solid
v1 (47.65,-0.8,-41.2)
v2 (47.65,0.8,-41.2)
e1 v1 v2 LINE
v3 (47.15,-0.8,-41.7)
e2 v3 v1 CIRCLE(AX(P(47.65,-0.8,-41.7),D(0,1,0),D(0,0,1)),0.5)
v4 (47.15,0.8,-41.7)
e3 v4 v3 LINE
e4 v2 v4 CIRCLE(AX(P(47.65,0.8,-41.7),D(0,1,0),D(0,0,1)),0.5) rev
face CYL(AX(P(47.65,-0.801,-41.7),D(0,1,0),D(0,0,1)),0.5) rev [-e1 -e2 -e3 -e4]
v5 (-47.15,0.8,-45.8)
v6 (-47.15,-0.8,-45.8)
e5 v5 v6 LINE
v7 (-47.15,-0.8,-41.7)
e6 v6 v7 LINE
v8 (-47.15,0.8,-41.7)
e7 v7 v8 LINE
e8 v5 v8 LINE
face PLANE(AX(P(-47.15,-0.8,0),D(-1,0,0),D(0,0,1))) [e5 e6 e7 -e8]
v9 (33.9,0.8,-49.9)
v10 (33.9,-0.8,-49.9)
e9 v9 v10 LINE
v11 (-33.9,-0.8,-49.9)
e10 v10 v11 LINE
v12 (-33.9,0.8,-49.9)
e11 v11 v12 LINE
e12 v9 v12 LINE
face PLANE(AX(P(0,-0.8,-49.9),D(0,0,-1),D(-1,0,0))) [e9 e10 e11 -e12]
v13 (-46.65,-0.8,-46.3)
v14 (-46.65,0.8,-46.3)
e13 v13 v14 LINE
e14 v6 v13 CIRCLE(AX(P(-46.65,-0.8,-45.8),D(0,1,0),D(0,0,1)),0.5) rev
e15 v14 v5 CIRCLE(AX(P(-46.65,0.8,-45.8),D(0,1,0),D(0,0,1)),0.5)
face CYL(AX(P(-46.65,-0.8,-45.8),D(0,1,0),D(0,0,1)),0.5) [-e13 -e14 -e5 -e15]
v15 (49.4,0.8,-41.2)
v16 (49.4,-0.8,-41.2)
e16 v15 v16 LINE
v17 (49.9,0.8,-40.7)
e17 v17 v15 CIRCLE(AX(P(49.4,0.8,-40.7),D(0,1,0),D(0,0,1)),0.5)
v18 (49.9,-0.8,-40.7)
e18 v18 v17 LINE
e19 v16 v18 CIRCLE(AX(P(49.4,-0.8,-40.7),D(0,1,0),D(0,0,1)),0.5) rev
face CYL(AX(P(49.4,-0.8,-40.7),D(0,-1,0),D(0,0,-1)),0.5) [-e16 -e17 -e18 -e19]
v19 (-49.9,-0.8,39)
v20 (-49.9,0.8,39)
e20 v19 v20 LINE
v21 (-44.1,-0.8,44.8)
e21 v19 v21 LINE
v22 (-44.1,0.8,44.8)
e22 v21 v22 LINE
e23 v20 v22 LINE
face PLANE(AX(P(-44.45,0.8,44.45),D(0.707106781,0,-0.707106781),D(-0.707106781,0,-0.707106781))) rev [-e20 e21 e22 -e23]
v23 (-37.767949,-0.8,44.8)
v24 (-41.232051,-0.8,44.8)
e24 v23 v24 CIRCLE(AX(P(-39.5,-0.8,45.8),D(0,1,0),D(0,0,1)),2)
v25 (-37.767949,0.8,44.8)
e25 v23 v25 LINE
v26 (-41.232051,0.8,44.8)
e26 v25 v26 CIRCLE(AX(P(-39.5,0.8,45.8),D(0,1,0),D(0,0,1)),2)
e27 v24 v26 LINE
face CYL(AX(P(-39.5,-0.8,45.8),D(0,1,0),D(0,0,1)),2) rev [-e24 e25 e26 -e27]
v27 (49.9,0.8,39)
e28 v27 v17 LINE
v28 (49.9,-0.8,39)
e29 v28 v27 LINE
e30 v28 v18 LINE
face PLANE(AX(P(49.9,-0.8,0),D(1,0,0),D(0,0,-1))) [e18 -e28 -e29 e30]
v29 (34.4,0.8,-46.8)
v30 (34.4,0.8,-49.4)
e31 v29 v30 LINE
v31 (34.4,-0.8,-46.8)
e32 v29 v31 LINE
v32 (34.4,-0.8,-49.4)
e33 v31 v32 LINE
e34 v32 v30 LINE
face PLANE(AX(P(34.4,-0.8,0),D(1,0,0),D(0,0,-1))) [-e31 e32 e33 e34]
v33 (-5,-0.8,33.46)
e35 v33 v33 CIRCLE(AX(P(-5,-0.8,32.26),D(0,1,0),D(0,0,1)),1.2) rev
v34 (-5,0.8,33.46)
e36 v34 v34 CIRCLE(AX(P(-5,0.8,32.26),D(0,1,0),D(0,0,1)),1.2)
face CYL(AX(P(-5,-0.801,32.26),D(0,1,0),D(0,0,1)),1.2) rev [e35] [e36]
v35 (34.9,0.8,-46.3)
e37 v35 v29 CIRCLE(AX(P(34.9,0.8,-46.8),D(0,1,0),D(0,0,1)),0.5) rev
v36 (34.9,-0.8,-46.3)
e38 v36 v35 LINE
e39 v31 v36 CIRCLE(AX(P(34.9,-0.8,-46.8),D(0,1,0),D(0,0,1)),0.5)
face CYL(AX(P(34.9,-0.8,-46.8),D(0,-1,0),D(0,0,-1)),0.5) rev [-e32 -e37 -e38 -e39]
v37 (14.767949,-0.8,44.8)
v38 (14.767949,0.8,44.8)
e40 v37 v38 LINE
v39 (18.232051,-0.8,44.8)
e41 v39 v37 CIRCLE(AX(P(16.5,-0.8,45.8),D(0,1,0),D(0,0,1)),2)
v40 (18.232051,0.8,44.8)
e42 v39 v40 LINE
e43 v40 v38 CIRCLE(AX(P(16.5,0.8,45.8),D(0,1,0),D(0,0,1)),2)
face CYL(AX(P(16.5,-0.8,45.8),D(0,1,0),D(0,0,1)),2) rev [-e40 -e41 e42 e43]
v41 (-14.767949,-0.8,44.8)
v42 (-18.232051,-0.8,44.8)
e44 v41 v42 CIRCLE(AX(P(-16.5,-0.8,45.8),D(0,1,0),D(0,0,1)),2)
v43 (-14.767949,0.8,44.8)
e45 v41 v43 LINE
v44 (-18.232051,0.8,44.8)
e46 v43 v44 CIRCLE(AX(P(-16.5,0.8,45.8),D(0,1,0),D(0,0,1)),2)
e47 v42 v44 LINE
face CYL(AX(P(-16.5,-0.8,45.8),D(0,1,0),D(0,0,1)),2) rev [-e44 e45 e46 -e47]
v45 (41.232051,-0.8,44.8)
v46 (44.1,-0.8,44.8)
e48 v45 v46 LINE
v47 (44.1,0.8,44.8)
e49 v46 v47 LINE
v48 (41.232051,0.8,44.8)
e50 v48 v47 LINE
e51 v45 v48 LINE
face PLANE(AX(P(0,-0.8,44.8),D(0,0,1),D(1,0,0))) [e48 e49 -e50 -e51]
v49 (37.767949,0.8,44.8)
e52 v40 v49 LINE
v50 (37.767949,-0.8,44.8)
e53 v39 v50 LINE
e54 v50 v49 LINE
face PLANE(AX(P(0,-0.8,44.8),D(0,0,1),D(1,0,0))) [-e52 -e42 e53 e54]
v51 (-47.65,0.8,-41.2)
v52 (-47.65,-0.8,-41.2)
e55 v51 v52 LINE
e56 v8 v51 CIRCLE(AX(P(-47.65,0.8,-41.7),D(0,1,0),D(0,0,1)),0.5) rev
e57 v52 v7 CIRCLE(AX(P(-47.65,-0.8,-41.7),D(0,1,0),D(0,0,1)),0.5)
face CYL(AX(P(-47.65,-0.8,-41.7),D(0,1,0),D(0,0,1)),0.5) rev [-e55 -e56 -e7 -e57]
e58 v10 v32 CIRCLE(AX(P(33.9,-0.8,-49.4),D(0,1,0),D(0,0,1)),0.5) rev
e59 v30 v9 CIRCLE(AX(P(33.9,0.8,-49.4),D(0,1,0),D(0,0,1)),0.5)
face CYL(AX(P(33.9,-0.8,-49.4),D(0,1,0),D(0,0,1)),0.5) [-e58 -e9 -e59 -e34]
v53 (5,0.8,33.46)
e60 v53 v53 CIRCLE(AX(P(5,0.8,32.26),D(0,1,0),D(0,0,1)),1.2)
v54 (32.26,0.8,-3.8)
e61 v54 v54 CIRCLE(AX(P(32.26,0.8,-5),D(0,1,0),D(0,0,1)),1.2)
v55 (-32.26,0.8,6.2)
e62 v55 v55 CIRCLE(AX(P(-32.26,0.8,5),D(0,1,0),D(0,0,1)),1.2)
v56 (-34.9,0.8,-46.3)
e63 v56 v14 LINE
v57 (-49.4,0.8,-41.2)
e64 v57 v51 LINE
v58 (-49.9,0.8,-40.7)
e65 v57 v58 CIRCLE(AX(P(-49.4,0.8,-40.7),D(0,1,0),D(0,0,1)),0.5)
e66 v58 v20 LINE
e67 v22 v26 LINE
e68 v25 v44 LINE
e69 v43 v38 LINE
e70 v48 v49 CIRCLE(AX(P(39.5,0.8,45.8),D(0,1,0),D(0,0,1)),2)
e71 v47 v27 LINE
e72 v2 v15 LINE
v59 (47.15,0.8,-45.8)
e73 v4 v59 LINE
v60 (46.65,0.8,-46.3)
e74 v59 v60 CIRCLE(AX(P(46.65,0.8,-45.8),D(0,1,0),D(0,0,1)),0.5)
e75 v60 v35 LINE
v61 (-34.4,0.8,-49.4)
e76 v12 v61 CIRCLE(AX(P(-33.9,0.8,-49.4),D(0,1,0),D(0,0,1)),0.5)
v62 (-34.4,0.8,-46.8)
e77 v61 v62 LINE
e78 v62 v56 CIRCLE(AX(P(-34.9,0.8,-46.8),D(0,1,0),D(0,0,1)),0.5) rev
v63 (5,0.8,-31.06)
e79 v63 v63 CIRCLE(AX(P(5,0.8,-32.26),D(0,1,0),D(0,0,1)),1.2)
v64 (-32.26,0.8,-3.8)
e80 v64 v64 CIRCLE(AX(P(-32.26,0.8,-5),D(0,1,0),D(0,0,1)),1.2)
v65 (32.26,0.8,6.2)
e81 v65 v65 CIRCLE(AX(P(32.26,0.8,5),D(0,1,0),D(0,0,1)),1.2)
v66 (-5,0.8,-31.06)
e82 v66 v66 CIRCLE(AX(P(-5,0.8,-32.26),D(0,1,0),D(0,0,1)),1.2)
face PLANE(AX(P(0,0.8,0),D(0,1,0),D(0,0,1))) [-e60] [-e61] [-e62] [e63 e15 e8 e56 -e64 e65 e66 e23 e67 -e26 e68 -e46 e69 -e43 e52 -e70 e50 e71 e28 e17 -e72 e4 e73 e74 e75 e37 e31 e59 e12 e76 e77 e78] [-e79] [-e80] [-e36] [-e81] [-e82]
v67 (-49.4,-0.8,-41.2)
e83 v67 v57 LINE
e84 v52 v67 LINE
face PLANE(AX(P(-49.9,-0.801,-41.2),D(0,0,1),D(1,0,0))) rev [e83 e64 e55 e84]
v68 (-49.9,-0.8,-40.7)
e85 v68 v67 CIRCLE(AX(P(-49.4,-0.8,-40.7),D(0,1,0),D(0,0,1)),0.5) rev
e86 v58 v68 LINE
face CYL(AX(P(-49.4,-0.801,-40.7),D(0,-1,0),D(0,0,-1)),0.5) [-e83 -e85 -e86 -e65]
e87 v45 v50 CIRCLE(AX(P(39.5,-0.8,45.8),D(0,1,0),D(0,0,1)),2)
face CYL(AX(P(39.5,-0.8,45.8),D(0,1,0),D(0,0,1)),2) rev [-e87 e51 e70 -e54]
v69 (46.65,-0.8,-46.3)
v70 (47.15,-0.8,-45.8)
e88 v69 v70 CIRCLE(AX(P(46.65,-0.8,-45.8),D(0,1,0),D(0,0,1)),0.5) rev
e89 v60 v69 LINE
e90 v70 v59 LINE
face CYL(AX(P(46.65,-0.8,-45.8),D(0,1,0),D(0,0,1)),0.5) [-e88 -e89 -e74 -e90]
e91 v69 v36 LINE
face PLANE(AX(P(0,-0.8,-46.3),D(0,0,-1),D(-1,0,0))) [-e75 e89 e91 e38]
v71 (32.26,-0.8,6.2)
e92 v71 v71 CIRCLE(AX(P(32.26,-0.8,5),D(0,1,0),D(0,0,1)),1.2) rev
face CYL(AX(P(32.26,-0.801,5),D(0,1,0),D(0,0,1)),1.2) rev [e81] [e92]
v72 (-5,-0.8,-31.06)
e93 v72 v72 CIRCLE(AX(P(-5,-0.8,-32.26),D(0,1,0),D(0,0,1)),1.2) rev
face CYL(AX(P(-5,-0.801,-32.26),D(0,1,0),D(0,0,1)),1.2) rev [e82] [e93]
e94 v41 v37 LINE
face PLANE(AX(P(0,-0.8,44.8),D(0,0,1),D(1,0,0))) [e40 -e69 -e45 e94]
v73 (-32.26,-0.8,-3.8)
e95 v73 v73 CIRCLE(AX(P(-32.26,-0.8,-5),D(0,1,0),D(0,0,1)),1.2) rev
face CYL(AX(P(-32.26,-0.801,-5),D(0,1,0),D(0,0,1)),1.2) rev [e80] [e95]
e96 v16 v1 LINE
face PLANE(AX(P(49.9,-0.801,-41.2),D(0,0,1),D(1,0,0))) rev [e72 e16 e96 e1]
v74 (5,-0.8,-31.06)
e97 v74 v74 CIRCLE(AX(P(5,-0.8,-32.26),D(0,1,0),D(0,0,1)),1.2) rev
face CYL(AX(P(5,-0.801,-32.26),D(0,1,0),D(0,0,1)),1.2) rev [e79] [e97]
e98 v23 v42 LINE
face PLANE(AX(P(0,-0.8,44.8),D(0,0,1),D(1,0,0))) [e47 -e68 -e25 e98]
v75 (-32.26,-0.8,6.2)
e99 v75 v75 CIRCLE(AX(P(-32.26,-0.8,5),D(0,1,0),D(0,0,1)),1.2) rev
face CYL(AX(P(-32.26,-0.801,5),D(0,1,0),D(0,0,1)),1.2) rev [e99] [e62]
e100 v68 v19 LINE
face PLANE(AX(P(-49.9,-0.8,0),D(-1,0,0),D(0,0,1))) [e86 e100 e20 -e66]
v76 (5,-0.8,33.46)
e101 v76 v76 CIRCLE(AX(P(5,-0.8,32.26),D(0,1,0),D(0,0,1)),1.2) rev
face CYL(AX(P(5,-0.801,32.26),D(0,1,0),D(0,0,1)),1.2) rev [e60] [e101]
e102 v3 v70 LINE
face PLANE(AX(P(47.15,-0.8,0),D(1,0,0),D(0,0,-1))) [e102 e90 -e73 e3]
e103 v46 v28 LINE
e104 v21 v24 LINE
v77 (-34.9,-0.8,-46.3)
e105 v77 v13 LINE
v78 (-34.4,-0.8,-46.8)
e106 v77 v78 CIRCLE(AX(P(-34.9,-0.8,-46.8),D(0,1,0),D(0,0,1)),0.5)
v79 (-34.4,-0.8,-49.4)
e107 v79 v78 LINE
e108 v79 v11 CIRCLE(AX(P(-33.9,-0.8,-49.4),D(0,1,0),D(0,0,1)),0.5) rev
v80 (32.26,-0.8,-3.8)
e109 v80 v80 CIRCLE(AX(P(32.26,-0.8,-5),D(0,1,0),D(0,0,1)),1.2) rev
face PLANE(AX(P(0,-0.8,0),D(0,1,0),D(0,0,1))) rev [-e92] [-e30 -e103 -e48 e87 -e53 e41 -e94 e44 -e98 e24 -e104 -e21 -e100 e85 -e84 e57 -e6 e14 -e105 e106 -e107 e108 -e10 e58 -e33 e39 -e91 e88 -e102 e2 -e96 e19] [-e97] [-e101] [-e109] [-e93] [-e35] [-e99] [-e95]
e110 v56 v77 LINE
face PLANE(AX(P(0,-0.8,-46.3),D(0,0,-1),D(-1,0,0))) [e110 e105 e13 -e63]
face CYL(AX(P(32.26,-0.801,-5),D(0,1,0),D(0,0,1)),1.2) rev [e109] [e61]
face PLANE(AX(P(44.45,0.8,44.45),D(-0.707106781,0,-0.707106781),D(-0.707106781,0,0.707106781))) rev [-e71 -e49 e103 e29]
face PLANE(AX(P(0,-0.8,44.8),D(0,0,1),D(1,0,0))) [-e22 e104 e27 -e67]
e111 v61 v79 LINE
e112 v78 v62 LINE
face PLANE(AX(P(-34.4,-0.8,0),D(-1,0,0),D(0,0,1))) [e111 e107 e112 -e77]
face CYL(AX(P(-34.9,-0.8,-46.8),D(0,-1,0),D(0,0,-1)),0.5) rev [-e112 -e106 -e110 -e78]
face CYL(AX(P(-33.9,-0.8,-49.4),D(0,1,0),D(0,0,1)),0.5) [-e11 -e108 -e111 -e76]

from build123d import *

# Parameters (mm, degrees)
GENERICCARDPCBDEFINITION_START = -0.8
GENERICCARDPCBDEFINITION_DEPTH = 1.6
CUT_EXTRUDE1_REACH             = 72.587
SKETCH1_R                      = 1.2


# Read off the part's stored shape, not the designer's step: GenericCardPCBDefinition
with BuildPart() as part:
    # GenericCardPCBDefinition outline → GenericCardPCBDefinition (new body)
    with BuildSketch(Plane(origin=(0, 0, 0), x_dir=(1, 0, 0), z_dir=(0, 1, 0)).offset(GENERICCARDPCBDEFINITION_START)):
        with BuildLine():
            Line((-49.9, -39), (-44.1, -44.8))
            Line((-44.1, -44.8), (-41.232050808, -44.8))
            ThreePointArc((-41.232050808, -44.8), (-39.5, -43.8), (-37.767949192, -44.8))
            Line((-37.767949192, -44.8), (-18.232050808, -44.8))
            ThreePointArc((-18.232050808, -44.8), (-16.5, -43.8), (-14.767949192, -44.8))
            Line((-14.767949192, -44.8), (14.767949192, -44.8))
            ThreePointArc((14.767949192, -44.8), (16.5, -43.8), (18.232050808, -44.8))
            Line((18.232050808, -44.8), (37.767949192, -44.8))
            ThreePointArc((37.767949192, -44.8), (39.5, -43.8), (41.232050808, -44.8))
            Line((41.232050808, -44.8), (44.1, -44.8))
            Line((44.1, -44.8), (49.9, -39))
            Line((49.9, -39), (49.9, 40.7))
            ThreePointArc((49.9, 40.7), (49.753553391, 41.053553391), (49.4, 41.2))
            Line((49.4, 41.2), (47.65, 41.2))
            ThreePointArc((47.65, 41.2), (47.296446609, 41.346446609), (47.15, 41.7))
            Line((47.15, 41.7), (47.15, 45.8))
            ThreePointArc((47.15, 45.8), (47.003553391, 46.153553391), (46.65, 46.3))
            Line((46.65, 46.3), (34.9, 46.3))
            ThreePointArc((34.9, 46.3), (34.546446609, 46.446446609), (34.4, 46.8))
            Line((34.4, 46.8), (34.4, 49.4))
            ThreePointArc((34.4, 49.4), (34.253553391, 49.753553391), (33.9, 49.9))
            Line((33.9, 49.9), (-33.9, 49.9))
            ThreePointArc((-33.9, 49.9), (-34.253553391, 49.753553391), (-34.4, 49.4))
            Line((-34.4, 49.4), (-34.4, 46.8))
            ThreePointArc((-34.4, 46.8), (-34.546446609, 46.446446609), (-34.9, 46.3))
            Line((-34.9, 46.3), (-46.65, 46.3))
            ThreePointArc((-46.65, 46.3), (-47.003553391, 46.153553391), (-47.15, 45.8))
            Line((-47.15, 45.8), (-47.15, 41.7))
            ThreePointArc((-47.15, 41.7), (-47.296446609, 41.346446609), (-47.65, 41.2))
            Line((-47.65, 41.2), (-49.4, 41.2))
            ThreePointArc((-49.4, 41.2), (-49.753553391, 41.053553391), (-49.9, 40.7))
            Line((-49.9, 40.7), (-49.9, -39))
        make_face()
    extrude(amount=GENERICCARDPCBDEFINITION_DEPTH)

    # Sketch1 → Cut-Extrude1 (cut, up to next)
    with BuildSketch(Plane(origin=(0, 0.8, 0), x_dir=(1, 0, 0), z_dir=(0, 1, 0)), mode=Mode.PRIVATE) as cut_extrude1_sk1:
        with Locations(Location((32.26, 5, 0), (0, 0, 270))):
            Circle(SKETCH1_R)
    cut_extrude1_tool1 = extrude(cut_extrude1_sk1.sketch, amount=-CUT_EXTRUDE1_REACH, mode=Mode.PRIVATE) & part.part
    # Sketch1 → Cut-Extrude1 (cut, up to next)
    with BuildSketch(Plane(origin=(0, 0.8, 0), x_dir=(1, 0, 0), z_dir=(0, 1, 0)), mode=Mode.PRIVATE) as cut_extrude1_sk2:
        with Locations(Location((32.26, -5, 0), (0, 0, 270))):
            Circle(SKETCH1_R)
    cut_extrude1_tool2 = extrude(cut_extrude1_sk2.sketch, amount=-CUT_EXTRUDE1_REACH, mode=Mode.PRIVATE) & part.part
    # Sketch1 → Cut-Extrude1 (cut, up to next)
    with BuildSketch(Plane(origin=(0, 0.8, 0), x_dir=(1, 0, 0), z_dir=(0, 1, 0)), mode=Mode.PRIVATE) as cut_extrude1_sk3:
        with Locations(Location((-32.26, 5, 0), (0, 0, 270))):
            Circle(SKETCH1_R)
    cut_extrude1_tool3 = extrude(cut_extrude1_sk3.sketch, amount=-CUT_EXTRUDE1_REACH, mode=Mode.PRIVATE) & part.part
    # Sketch1 → Cut-Extrude1 (cut, up to next)
    with BuildSketch(Plane(origin=(0, 0.8, 0), x_dir=(1, 0, 0), z_dir=(0, 1, 0)), mode=Mode.PRIVATE) as cut_extrude1_sk4:
        with Locations(Location((-32.26, -5, 0), (0, 0, 270))):
            Circle(SKETCH1_R)
    cut_extrude1_tool4 = extrude(cut_extrude1_sk4.sketch, amount=-CUT_EXTRUDE1_REACH, mode=Mode.PRIVATE) & part.part
    # Sketch1 → Cut-Extrude1 (cut, up to next)
    with BuildSketch(Plane(origin=(0, 0.8, 0), x_dir=(1, 0, 0), z_dir=(0, 1, 0)), mode=Mode.PRIVATE) as cut_extrude1_sk5:
        with Locations(Location((-5, -32.26, 0), (0, 0, 270))):
            Circle(SKETCH1_R)
    cut_extrude1_tool5 = extrude(cut_extrude1_sk5.sketch, amount=-CUT_EXTRUDE1_REACH, mode=Mode.PRIVATE) & part.part
    # Sketch1 → Cut-Extrude1 (cut, up to next)
    with BuildSketch(Plane(origin=(0, 0.8, 0), x_dir=(1, 0, 0), z_dir=(0, 1, 0)), mode=Mode.PRIVATE) as cut_extrude1_sk6:
        with Locations(Location((5, -32.26, 0), (0, 0, 270))):
            Circle(SKETCH1_R)
    cut_extrude1_tool6 = extrude(cut_extrude1_sk6.sketch, amount=-CUT_EXTRUDE1_REACH, mode=Mode.PRIVATE) & part.part
    # Sketch1 → Cut-Extrude1 (cut, up to next)
    with BuildSketch(Plane(origin=(0, 0.8, 0), x_dir=(1, 0, 0), z_dir=(0, 1, 0)), mode=Mode.PRIVATE) as cut_extrude1_sk7:
        with Locations(Location((-5, 32.26, 0), (0, 0, 270))):
            Circle(SKETCH1_R)
    cut_extrude1_tool7 = extrude(cut_extrude1_sk7.sketch, amount=-CUT_EXTRUDE1_REACH, mode=Mode.PRIVATE) & part.part
    # Sketch1 → Cut-Extrude1 (cut, up to next)
    with BuildSketch(Plane(origin=(0, 0.8, 0), x_dir=(1, 0, 0), z_dir=(0, 1, 0)), mode=Mode.PRIVATE) as cut_extrude1_sk8:
        with Locations(Location((5, 32.26, 0), (0, 0, 270))):
            Circle(SKETCH1_R)
    cut_extrude1_tool8 = extrude(cut_extrude1_sk8.sketch, amount=-CUT_EXTRUDE1_REACH, mode=Mode.PRIVATE) & part.part
    add(cut_extrude1_tool1.solids().sort_by_distance((32.26, 0.8, -5))[0], mode=Mode.SUBTRACT)
    add(cut_extrude1_tool2.solids().sort_by_distance((32.26, 0.8, 5))[0], mode=Mode.SUBTRACT)
    add(cut_extrude1_tool3.solids().sort_by_distance((-32.26, 0.8, -5))[0], mode=Mode.SUBTRACT)
    add(cut_extrude1_tool4.solids().sort_by_distance((-32.26, 0.8, 5))[0], mode=Mode.SUBTRACT)
    add(cut_extrude1_tool5.solids().sort_by_distance((-5, 0.8, 32.26))[0], mode=Mode.SUBTRACT)
    add(cut_extrude1_tool6.solids().sort_by_distance((5, 0.8, 32.26))[0], mode=Mode.SUBTRACT)
    add(cut_extrude1_tool7.solids().sort_by_distance((-5, 0.8, -32.26))[0], mode=Mode.SUBTRACT)
    add(cut_extrude1_tool8.solids().sort_by_distance((5, 0.8, -32.26))[0], mode=Mode.SUBTRACT)


solid = part.part
